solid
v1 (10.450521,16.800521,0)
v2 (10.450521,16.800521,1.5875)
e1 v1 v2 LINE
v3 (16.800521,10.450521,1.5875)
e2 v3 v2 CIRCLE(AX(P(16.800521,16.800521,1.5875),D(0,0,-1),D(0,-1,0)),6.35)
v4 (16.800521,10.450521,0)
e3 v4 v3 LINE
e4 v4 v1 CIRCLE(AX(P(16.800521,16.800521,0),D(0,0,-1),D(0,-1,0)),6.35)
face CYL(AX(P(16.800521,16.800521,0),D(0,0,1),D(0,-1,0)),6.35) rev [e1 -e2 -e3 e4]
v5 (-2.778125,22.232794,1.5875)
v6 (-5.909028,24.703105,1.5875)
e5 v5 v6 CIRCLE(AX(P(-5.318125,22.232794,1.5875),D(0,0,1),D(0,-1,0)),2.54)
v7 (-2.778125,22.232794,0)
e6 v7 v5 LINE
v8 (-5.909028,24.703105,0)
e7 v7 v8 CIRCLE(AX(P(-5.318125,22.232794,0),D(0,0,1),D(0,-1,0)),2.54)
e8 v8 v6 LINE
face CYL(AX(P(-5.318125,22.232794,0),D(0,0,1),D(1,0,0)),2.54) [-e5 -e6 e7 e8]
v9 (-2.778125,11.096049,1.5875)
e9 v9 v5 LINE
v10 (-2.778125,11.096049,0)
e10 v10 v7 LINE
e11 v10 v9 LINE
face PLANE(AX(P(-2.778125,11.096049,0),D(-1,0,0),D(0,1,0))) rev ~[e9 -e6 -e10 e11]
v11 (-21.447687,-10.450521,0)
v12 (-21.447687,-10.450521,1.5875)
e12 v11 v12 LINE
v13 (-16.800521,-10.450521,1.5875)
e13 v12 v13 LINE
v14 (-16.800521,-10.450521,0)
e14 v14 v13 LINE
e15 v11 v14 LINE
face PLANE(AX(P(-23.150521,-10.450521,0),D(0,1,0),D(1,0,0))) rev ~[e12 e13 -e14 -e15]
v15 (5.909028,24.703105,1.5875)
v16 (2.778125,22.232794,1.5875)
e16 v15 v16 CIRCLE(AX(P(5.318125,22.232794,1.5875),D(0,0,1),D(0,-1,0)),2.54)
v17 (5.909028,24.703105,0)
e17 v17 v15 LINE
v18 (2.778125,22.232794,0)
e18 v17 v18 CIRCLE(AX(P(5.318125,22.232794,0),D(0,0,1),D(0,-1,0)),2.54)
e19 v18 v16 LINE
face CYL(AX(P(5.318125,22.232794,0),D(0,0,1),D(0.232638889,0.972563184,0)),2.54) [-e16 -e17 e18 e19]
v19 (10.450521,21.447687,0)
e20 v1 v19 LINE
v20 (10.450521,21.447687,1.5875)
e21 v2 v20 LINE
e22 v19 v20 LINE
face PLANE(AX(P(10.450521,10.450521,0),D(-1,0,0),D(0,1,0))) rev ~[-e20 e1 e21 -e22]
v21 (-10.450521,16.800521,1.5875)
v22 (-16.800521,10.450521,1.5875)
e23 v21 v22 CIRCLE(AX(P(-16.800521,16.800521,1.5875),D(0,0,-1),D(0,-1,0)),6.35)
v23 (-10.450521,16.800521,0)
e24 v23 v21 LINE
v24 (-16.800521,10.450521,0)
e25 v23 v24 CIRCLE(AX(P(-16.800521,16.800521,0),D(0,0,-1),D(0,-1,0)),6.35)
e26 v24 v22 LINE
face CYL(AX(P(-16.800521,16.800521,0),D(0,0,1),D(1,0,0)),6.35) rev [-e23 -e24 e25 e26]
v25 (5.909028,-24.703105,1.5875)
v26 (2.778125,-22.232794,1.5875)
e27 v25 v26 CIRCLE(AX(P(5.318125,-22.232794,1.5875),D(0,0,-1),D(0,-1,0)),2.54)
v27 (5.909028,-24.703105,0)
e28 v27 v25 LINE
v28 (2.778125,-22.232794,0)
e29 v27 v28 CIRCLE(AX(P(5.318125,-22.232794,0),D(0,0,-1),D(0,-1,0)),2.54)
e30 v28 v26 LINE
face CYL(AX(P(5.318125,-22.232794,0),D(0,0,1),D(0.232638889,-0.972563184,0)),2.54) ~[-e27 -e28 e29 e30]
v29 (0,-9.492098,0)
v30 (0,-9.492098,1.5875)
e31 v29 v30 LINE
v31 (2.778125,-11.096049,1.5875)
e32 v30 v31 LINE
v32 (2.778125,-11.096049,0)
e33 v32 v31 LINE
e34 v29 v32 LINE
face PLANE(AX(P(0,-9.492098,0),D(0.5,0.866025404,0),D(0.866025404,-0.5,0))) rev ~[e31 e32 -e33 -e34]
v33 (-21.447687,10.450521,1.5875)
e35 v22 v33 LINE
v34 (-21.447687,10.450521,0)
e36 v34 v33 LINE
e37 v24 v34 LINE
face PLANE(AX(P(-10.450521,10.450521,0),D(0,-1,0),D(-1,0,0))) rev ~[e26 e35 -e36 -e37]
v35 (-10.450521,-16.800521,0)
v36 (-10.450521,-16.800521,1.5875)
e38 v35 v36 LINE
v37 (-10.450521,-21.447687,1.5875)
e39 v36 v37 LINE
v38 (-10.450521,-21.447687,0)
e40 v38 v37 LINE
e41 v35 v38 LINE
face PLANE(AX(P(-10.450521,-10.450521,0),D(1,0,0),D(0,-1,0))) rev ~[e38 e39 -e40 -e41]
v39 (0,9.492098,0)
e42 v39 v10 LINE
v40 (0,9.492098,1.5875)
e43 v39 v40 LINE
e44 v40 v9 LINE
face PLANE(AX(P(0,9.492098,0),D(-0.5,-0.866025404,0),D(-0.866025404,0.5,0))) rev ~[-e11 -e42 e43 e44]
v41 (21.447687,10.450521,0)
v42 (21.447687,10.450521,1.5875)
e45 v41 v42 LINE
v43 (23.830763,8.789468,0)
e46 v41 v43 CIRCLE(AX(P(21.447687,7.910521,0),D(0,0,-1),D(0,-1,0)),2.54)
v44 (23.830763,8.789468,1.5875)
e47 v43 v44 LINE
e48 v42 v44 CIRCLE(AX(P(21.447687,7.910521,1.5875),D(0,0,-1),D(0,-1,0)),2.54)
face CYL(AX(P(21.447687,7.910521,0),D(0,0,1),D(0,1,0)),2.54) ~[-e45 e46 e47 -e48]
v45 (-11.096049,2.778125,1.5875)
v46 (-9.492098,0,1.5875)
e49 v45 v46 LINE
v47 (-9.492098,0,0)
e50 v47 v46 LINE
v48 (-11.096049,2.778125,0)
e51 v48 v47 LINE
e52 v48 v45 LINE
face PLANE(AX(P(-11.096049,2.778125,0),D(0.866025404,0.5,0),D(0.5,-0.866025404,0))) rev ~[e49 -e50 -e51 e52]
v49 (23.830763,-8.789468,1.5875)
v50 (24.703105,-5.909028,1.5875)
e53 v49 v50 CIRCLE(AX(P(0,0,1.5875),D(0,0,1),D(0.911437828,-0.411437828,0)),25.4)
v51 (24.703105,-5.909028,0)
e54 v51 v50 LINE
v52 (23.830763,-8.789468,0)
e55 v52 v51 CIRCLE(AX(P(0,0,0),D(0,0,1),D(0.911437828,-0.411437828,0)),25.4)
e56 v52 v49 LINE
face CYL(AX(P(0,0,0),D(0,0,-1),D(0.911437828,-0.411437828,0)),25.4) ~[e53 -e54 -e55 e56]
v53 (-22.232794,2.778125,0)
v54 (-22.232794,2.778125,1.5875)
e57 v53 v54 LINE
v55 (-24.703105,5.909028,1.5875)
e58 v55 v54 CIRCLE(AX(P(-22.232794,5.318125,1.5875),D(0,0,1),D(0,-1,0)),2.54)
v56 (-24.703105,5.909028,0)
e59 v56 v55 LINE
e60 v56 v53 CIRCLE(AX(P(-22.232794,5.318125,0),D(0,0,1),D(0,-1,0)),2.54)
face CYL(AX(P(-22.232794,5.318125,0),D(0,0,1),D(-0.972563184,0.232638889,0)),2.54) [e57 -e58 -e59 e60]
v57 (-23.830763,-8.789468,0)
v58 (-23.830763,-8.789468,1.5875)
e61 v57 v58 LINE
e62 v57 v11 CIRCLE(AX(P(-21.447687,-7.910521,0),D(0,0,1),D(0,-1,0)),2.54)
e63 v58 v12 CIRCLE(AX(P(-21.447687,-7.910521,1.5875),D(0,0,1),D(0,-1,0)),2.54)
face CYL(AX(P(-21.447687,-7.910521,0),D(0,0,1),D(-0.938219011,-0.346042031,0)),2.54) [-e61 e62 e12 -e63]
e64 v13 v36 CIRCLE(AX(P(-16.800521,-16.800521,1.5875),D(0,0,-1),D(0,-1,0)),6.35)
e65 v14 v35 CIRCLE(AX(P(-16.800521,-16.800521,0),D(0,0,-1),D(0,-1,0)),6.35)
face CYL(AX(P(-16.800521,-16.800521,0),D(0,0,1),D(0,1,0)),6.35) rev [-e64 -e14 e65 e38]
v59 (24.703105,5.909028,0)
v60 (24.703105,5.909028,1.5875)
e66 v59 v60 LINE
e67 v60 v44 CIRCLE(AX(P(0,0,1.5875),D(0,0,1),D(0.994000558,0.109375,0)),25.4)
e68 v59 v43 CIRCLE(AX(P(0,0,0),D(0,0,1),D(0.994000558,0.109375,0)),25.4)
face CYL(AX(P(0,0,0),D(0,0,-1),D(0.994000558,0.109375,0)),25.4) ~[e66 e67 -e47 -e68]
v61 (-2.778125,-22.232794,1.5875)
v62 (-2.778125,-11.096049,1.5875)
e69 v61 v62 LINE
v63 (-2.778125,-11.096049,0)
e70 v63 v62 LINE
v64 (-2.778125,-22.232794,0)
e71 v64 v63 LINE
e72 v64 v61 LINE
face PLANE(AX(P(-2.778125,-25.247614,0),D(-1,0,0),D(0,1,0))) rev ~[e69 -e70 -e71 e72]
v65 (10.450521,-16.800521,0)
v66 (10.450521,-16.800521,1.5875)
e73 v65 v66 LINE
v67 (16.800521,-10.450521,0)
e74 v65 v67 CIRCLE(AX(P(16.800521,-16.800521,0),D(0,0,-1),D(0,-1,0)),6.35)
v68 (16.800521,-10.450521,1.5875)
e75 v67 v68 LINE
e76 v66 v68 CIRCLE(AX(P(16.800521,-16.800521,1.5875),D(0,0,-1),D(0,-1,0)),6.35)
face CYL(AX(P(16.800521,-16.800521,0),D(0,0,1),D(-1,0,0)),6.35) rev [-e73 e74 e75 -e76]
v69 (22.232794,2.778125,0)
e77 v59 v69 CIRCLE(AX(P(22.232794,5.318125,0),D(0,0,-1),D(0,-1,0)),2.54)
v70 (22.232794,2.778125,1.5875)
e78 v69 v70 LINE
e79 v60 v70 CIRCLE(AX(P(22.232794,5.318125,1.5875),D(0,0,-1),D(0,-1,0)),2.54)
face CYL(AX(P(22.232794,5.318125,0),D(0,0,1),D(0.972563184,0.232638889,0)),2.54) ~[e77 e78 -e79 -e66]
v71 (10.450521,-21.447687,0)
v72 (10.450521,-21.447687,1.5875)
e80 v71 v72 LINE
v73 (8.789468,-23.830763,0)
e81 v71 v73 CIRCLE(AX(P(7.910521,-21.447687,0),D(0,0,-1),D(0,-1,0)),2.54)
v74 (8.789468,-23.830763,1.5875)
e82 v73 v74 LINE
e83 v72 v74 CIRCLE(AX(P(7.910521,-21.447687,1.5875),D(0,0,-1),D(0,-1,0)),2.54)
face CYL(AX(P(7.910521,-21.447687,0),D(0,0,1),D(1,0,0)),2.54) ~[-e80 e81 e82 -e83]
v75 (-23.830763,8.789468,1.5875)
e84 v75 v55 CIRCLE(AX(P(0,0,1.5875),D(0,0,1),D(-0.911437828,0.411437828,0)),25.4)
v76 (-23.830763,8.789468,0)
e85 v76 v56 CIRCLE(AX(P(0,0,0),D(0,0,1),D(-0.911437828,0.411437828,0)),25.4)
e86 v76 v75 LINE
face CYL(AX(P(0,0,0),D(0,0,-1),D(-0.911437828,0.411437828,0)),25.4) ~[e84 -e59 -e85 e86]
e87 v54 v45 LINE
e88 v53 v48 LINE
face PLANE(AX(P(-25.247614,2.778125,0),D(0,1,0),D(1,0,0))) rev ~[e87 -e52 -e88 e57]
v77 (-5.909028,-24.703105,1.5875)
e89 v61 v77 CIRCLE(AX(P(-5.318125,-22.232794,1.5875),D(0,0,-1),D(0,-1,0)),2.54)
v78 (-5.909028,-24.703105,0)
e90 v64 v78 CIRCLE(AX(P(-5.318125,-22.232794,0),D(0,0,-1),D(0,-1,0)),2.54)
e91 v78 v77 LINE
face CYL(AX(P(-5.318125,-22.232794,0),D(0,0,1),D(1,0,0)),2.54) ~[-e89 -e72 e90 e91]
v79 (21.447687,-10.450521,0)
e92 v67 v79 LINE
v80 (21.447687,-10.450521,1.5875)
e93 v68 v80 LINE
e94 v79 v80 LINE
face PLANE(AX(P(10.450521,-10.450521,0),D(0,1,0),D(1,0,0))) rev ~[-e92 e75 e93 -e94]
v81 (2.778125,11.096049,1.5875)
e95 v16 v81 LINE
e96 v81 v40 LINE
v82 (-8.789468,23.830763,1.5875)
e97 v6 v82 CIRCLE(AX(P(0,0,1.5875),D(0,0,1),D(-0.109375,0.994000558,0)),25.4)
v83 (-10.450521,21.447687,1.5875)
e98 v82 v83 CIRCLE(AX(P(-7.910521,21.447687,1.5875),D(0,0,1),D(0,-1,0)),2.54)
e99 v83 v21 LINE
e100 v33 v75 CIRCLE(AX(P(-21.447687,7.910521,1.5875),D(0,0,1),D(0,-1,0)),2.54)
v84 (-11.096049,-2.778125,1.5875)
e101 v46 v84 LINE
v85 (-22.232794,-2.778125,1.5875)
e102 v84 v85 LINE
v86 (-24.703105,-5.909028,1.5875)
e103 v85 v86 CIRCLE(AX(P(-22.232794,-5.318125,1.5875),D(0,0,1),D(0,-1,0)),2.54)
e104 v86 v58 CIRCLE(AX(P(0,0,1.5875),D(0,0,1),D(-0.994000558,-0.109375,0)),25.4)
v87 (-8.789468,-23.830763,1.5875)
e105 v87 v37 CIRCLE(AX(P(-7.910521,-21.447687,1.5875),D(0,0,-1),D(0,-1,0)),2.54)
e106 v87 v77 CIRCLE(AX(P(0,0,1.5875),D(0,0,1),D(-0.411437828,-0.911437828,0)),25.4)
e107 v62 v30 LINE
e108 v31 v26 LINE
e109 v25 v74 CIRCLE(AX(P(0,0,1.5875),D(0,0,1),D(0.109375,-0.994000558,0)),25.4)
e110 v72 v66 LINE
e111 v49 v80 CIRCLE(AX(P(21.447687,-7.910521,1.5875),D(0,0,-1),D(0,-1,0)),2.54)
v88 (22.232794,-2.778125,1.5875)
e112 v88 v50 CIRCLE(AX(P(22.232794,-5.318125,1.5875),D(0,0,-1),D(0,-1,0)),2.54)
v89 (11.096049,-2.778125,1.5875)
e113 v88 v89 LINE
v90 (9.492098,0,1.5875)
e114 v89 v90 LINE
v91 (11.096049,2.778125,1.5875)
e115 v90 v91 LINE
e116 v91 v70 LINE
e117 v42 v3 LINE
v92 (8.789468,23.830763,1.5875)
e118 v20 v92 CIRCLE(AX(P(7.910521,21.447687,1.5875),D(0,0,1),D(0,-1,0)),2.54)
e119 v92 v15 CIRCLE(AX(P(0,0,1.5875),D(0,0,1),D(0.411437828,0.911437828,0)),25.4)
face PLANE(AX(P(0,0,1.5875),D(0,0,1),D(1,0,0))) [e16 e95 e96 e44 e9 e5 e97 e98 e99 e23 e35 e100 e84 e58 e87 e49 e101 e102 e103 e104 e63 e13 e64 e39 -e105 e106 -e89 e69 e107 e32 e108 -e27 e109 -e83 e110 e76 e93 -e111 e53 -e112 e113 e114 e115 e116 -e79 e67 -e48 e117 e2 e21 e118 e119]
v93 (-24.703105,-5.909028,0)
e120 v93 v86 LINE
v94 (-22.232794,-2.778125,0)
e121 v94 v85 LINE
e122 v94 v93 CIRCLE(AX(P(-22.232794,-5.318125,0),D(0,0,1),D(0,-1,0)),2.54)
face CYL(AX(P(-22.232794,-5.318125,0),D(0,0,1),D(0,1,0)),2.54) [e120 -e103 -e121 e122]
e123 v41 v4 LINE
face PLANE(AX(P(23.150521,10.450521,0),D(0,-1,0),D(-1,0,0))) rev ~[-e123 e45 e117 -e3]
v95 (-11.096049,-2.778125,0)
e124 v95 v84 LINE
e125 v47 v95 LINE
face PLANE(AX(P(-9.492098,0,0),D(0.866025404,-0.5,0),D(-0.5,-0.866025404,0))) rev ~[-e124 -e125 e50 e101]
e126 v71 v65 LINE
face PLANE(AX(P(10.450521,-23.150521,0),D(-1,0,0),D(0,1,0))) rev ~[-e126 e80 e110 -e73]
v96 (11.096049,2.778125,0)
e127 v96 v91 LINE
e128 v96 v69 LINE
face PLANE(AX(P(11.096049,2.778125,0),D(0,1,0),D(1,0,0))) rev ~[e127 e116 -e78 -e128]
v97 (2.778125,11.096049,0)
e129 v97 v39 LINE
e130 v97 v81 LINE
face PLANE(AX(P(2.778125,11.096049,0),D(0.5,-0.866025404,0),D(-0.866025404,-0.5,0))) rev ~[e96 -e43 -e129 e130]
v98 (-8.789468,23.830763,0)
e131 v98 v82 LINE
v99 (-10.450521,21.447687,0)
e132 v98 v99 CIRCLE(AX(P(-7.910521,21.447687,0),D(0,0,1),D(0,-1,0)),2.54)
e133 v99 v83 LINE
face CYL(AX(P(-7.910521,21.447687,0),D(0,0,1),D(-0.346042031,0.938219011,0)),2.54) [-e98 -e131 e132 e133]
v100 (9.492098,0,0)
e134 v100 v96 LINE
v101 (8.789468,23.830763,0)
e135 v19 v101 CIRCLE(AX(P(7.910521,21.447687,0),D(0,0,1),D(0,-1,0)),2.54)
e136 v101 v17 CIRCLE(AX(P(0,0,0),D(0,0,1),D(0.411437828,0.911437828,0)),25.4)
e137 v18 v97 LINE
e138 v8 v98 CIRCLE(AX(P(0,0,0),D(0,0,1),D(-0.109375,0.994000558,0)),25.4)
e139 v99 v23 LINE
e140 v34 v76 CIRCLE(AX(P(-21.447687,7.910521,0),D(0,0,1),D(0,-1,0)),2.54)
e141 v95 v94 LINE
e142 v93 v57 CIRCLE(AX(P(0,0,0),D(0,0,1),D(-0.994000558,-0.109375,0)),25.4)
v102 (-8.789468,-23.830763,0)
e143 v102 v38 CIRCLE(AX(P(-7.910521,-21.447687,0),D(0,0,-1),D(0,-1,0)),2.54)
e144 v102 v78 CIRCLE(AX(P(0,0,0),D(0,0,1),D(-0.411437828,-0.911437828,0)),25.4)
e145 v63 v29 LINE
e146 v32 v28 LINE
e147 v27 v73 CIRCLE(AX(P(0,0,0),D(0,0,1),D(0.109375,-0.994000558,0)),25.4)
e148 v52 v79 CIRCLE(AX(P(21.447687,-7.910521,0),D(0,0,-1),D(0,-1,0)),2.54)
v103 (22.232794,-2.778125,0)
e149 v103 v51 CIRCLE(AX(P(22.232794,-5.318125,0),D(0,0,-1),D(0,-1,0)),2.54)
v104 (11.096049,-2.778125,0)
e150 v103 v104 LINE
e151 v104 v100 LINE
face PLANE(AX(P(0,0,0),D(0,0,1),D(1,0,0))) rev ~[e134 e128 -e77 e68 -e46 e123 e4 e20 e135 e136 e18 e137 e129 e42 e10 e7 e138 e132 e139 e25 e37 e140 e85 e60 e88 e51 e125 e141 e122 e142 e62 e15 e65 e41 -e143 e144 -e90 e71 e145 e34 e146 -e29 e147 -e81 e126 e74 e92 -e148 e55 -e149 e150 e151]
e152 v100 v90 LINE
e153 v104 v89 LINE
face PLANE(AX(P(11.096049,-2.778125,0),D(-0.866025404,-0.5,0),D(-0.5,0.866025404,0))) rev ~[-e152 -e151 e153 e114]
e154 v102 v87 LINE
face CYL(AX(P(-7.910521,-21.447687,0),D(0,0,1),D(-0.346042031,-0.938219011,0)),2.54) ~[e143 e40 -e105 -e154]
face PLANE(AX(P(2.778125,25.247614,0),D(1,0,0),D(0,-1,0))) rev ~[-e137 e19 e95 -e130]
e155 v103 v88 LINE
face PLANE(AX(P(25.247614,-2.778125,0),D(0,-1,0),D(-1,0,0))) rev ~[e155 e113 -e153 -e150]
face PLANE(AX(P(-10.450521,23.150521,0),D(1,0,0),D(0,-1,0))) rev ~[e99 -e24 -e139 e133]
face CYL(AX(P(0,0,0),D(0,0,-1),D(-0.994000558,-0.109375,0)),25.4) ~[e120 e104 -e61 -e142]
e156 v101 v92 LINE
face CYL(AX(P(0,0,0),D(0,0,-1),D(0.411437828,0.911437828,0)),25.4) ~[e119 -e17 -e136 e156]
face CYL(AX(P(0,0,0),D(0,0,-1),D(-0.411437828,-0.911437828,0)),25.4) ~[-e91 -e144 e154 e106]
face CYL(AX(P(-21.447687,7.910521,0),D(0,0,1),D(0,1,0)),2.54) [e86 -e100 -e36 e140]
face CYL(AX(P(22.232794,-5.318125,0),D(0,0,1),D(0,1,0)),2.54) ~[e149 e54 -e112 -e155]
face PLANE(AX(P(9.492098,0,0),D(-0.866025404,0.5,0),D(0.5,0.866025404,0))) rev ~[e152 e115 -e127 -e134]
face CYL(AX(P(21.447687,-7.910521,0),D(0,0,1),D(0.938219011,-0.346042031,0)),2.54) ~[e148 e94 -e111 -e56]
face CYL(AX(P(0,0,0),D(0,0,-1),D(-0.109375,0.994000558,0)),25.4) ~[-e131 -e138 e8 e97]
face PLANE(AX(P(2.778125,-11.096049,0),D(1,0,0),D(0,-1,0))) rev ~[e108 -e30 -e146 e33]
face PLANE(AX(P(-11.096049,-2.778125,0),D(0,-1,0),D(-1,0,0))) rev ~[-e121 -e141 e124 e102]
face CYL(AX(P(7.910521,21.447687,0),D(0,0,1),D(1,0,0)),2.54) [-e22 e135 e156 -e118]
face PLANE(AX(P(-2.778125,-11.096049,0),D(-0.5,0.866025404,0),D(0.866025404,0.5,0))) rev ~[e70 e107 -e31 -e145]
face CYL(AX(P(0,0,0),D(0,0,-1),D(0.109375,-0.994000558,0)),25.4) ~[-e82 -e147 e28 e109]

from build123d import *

# Parameters (mm, degrees)
F1_DEPTH = 1.5875
F2_R     = 6.35
F3_R     = 2.54


# Not quite as in the source:
# - a feature names something its author has since deleted; it is built from what else it names


with BuildPart() as f1:
    # F0 (on Top) → F1 (new body)
    with BuildSketch(Plane.XY):
        with BuildLine():
            Line((14.3039512166, 2.778125), (25.2476141741, 2.778125))
            ThreePointArc((25.2476141741, 2.778125), (24.5012506268, 6.6969185243), (23.1505208253, 10.4505208253))
            Line((23.1505208253, 10.4505208253), (10.4505208253, 10.4505208253))
            Line((10.4505208253, 10.4505208253), (10.4505208253, 23.1505208253))
            ThreePointArc((10.4505208253, 23.1505208253), (6.6969185243, 24.5012506268), (2.778125, 25.2476141741))
            Line((2.778125, 25.2476141741), (2.778125, 14.3039512166))
            Line((2.778125, 14.3039512166), (2.778125, 11.0960487834))
            Line((2.778125, 11.0960487834), (0, 9.4920975668))
            Line((0, 9.4920975668), (-2.778125, 11.0960487834))
            Line((-2.778125, 11.0960487834), (-2.778125, 14.3039512166))
            Line((-2.778125, 14.3039512166), (-2.778125, 25.2476141741))
            ThreePointArc((-2.778125, 25.2476141741), (-6.6969185243, 24.5012506268), (-10.4505208253, 23.1505208253))
            Line((-10.4505208253, 23.1505208253), (-10.4505208253, 10.4505208253))
            Line((-10.4505208253, 10.4505208253), (-23.1505208253, 10.4505208253))
            ThreePointArc((-23.1505208253, 10.4505208253), (-24.5012506268, 6.6969185243), (-25.2476141741, 2.778125))
            Line((-25.2476141741, 2.778125), (-14.3039512166, 2.778125))
            Line((-14.3039512166, 2.778125), (-11.0960487834, 2.778125))
            Line((-11.0960487834, 2.778125), (-9.4920975668, 0))
            Line((-9.4920975668, 0), (-11.0960487834, -2.778125))
            Line((-11.0960487834, -2.778125), (-14.3039512166, -2.778125))
            Line((-14.3039512166, -2.778125), (-25.2476141741, -2.778125))
            ThreePointArc((-25.2476141741, -2.778125), (-24.5012506268, -6.6969185243), (-23.1505208253, -10.4505208253))
            Line((-23.1505208253, -10.4505208253), (-10.4505208253, -10.4505208253))
            Line((-10.4505208253, -10.4505208253), (-10.4505208253, -23.1505208253))
            ThreePointArc((-10.4505208253, -23.1505208253), (-6.6969185243, -24.5012506268), (-2.778125, -25.2476141741))
            Line((-2.778125, -25.2476141741), (-2.778125, -14.3039512166))
            Line((-2.778125, -14.3039512166), (-2.778125, -11.0960487834))
            Line((-2.778125, -11.0960487834), (0, -9.4920975668))
            Line((0, -9.4920975668), (2.778125, -11.0960487834))
            Line((2.778125, -11.0960487834), (2.778125, -14.3039512166))
            Line((2.778125, -14.3039512166), (2.778125, -25.2476141741))
            ThreePointArc((2.778125, -25.2476141741), (6.6969185243, -24.5012506268), (10.4505208253, -23.1505208253))
            Line((10.4505208253, -23.1505208253), (10.4505208253, -10.4505208253))
            Line((10.4505208253, -10.4505208253), (23.1505208253, -10.4505208253))
            ThreePointArc((23.1505208253, -10.4505208253), (24.5012506268, -6.6969185243), (25.2476141741, -2.778125))
            Line((25.2476141741, -2.778125), (14.3039512166, -2.778125))
            Line((14.3039512166, -2.778125), (11.0960487834, -2.778125))
            Line((11.0960487834, -2.778125), (9.4920975668, 0))
            Line((9.4920975668, 0), (11.0960487834, 2.778125))
            Line((11.0960487834, 2.778125), (14.3039512166, 2.778125))
        make_face()
    extrude(amount=F1_DEPTH)

    # F2
    f2_edges = [f1.edges().sort_by_distance(p)[0] for p in [
        (-10.450521, -10.450521, 0.79375),
        (10.450521, -10.450521, 0.79375),
        (10.450521, 10.450521, 0.79375),
        (-10.450521, 10.450521, 0.79375),
    ]]
    fillet(f2_edges, radius=F2_R)

    # F3
    f3_edges = [f1.edges().sort_by_distance(p)[0] for p in [
        (2.778125, 25.247614, 0.79375),
        (-2.778125, 25.247614, 0.79375),
        (25.247614, 2.778125, 0.79375),
        (25.247614, -2.778125, 0.79375),
        (2.778125, -25.247614, 0.79375),
        (-2.778125, -25.247614, 0.79375),
        (-25.247614, -2.778125, 0.79375),
        (-25.247614, 2.778125, 0.79375),
        (23.150521, 10.450521, 0.79375),
        (10.450521, -23.150521, 0.79375),
        (-10.450521, -23.150521, 0.79375),
        (-23.150521, -10.450521, 0.79375),
        (-23.150521, 10.450521, 0.79375),
        (-10.450521, 23.150521, 0.79375),
        (10.450521, 23.150521, 0.79375),
        (23.150521, -10.450521, 0.79375),
    ]]
    fillet(f3_edges, radius=F3_R)


solid = f1.part
